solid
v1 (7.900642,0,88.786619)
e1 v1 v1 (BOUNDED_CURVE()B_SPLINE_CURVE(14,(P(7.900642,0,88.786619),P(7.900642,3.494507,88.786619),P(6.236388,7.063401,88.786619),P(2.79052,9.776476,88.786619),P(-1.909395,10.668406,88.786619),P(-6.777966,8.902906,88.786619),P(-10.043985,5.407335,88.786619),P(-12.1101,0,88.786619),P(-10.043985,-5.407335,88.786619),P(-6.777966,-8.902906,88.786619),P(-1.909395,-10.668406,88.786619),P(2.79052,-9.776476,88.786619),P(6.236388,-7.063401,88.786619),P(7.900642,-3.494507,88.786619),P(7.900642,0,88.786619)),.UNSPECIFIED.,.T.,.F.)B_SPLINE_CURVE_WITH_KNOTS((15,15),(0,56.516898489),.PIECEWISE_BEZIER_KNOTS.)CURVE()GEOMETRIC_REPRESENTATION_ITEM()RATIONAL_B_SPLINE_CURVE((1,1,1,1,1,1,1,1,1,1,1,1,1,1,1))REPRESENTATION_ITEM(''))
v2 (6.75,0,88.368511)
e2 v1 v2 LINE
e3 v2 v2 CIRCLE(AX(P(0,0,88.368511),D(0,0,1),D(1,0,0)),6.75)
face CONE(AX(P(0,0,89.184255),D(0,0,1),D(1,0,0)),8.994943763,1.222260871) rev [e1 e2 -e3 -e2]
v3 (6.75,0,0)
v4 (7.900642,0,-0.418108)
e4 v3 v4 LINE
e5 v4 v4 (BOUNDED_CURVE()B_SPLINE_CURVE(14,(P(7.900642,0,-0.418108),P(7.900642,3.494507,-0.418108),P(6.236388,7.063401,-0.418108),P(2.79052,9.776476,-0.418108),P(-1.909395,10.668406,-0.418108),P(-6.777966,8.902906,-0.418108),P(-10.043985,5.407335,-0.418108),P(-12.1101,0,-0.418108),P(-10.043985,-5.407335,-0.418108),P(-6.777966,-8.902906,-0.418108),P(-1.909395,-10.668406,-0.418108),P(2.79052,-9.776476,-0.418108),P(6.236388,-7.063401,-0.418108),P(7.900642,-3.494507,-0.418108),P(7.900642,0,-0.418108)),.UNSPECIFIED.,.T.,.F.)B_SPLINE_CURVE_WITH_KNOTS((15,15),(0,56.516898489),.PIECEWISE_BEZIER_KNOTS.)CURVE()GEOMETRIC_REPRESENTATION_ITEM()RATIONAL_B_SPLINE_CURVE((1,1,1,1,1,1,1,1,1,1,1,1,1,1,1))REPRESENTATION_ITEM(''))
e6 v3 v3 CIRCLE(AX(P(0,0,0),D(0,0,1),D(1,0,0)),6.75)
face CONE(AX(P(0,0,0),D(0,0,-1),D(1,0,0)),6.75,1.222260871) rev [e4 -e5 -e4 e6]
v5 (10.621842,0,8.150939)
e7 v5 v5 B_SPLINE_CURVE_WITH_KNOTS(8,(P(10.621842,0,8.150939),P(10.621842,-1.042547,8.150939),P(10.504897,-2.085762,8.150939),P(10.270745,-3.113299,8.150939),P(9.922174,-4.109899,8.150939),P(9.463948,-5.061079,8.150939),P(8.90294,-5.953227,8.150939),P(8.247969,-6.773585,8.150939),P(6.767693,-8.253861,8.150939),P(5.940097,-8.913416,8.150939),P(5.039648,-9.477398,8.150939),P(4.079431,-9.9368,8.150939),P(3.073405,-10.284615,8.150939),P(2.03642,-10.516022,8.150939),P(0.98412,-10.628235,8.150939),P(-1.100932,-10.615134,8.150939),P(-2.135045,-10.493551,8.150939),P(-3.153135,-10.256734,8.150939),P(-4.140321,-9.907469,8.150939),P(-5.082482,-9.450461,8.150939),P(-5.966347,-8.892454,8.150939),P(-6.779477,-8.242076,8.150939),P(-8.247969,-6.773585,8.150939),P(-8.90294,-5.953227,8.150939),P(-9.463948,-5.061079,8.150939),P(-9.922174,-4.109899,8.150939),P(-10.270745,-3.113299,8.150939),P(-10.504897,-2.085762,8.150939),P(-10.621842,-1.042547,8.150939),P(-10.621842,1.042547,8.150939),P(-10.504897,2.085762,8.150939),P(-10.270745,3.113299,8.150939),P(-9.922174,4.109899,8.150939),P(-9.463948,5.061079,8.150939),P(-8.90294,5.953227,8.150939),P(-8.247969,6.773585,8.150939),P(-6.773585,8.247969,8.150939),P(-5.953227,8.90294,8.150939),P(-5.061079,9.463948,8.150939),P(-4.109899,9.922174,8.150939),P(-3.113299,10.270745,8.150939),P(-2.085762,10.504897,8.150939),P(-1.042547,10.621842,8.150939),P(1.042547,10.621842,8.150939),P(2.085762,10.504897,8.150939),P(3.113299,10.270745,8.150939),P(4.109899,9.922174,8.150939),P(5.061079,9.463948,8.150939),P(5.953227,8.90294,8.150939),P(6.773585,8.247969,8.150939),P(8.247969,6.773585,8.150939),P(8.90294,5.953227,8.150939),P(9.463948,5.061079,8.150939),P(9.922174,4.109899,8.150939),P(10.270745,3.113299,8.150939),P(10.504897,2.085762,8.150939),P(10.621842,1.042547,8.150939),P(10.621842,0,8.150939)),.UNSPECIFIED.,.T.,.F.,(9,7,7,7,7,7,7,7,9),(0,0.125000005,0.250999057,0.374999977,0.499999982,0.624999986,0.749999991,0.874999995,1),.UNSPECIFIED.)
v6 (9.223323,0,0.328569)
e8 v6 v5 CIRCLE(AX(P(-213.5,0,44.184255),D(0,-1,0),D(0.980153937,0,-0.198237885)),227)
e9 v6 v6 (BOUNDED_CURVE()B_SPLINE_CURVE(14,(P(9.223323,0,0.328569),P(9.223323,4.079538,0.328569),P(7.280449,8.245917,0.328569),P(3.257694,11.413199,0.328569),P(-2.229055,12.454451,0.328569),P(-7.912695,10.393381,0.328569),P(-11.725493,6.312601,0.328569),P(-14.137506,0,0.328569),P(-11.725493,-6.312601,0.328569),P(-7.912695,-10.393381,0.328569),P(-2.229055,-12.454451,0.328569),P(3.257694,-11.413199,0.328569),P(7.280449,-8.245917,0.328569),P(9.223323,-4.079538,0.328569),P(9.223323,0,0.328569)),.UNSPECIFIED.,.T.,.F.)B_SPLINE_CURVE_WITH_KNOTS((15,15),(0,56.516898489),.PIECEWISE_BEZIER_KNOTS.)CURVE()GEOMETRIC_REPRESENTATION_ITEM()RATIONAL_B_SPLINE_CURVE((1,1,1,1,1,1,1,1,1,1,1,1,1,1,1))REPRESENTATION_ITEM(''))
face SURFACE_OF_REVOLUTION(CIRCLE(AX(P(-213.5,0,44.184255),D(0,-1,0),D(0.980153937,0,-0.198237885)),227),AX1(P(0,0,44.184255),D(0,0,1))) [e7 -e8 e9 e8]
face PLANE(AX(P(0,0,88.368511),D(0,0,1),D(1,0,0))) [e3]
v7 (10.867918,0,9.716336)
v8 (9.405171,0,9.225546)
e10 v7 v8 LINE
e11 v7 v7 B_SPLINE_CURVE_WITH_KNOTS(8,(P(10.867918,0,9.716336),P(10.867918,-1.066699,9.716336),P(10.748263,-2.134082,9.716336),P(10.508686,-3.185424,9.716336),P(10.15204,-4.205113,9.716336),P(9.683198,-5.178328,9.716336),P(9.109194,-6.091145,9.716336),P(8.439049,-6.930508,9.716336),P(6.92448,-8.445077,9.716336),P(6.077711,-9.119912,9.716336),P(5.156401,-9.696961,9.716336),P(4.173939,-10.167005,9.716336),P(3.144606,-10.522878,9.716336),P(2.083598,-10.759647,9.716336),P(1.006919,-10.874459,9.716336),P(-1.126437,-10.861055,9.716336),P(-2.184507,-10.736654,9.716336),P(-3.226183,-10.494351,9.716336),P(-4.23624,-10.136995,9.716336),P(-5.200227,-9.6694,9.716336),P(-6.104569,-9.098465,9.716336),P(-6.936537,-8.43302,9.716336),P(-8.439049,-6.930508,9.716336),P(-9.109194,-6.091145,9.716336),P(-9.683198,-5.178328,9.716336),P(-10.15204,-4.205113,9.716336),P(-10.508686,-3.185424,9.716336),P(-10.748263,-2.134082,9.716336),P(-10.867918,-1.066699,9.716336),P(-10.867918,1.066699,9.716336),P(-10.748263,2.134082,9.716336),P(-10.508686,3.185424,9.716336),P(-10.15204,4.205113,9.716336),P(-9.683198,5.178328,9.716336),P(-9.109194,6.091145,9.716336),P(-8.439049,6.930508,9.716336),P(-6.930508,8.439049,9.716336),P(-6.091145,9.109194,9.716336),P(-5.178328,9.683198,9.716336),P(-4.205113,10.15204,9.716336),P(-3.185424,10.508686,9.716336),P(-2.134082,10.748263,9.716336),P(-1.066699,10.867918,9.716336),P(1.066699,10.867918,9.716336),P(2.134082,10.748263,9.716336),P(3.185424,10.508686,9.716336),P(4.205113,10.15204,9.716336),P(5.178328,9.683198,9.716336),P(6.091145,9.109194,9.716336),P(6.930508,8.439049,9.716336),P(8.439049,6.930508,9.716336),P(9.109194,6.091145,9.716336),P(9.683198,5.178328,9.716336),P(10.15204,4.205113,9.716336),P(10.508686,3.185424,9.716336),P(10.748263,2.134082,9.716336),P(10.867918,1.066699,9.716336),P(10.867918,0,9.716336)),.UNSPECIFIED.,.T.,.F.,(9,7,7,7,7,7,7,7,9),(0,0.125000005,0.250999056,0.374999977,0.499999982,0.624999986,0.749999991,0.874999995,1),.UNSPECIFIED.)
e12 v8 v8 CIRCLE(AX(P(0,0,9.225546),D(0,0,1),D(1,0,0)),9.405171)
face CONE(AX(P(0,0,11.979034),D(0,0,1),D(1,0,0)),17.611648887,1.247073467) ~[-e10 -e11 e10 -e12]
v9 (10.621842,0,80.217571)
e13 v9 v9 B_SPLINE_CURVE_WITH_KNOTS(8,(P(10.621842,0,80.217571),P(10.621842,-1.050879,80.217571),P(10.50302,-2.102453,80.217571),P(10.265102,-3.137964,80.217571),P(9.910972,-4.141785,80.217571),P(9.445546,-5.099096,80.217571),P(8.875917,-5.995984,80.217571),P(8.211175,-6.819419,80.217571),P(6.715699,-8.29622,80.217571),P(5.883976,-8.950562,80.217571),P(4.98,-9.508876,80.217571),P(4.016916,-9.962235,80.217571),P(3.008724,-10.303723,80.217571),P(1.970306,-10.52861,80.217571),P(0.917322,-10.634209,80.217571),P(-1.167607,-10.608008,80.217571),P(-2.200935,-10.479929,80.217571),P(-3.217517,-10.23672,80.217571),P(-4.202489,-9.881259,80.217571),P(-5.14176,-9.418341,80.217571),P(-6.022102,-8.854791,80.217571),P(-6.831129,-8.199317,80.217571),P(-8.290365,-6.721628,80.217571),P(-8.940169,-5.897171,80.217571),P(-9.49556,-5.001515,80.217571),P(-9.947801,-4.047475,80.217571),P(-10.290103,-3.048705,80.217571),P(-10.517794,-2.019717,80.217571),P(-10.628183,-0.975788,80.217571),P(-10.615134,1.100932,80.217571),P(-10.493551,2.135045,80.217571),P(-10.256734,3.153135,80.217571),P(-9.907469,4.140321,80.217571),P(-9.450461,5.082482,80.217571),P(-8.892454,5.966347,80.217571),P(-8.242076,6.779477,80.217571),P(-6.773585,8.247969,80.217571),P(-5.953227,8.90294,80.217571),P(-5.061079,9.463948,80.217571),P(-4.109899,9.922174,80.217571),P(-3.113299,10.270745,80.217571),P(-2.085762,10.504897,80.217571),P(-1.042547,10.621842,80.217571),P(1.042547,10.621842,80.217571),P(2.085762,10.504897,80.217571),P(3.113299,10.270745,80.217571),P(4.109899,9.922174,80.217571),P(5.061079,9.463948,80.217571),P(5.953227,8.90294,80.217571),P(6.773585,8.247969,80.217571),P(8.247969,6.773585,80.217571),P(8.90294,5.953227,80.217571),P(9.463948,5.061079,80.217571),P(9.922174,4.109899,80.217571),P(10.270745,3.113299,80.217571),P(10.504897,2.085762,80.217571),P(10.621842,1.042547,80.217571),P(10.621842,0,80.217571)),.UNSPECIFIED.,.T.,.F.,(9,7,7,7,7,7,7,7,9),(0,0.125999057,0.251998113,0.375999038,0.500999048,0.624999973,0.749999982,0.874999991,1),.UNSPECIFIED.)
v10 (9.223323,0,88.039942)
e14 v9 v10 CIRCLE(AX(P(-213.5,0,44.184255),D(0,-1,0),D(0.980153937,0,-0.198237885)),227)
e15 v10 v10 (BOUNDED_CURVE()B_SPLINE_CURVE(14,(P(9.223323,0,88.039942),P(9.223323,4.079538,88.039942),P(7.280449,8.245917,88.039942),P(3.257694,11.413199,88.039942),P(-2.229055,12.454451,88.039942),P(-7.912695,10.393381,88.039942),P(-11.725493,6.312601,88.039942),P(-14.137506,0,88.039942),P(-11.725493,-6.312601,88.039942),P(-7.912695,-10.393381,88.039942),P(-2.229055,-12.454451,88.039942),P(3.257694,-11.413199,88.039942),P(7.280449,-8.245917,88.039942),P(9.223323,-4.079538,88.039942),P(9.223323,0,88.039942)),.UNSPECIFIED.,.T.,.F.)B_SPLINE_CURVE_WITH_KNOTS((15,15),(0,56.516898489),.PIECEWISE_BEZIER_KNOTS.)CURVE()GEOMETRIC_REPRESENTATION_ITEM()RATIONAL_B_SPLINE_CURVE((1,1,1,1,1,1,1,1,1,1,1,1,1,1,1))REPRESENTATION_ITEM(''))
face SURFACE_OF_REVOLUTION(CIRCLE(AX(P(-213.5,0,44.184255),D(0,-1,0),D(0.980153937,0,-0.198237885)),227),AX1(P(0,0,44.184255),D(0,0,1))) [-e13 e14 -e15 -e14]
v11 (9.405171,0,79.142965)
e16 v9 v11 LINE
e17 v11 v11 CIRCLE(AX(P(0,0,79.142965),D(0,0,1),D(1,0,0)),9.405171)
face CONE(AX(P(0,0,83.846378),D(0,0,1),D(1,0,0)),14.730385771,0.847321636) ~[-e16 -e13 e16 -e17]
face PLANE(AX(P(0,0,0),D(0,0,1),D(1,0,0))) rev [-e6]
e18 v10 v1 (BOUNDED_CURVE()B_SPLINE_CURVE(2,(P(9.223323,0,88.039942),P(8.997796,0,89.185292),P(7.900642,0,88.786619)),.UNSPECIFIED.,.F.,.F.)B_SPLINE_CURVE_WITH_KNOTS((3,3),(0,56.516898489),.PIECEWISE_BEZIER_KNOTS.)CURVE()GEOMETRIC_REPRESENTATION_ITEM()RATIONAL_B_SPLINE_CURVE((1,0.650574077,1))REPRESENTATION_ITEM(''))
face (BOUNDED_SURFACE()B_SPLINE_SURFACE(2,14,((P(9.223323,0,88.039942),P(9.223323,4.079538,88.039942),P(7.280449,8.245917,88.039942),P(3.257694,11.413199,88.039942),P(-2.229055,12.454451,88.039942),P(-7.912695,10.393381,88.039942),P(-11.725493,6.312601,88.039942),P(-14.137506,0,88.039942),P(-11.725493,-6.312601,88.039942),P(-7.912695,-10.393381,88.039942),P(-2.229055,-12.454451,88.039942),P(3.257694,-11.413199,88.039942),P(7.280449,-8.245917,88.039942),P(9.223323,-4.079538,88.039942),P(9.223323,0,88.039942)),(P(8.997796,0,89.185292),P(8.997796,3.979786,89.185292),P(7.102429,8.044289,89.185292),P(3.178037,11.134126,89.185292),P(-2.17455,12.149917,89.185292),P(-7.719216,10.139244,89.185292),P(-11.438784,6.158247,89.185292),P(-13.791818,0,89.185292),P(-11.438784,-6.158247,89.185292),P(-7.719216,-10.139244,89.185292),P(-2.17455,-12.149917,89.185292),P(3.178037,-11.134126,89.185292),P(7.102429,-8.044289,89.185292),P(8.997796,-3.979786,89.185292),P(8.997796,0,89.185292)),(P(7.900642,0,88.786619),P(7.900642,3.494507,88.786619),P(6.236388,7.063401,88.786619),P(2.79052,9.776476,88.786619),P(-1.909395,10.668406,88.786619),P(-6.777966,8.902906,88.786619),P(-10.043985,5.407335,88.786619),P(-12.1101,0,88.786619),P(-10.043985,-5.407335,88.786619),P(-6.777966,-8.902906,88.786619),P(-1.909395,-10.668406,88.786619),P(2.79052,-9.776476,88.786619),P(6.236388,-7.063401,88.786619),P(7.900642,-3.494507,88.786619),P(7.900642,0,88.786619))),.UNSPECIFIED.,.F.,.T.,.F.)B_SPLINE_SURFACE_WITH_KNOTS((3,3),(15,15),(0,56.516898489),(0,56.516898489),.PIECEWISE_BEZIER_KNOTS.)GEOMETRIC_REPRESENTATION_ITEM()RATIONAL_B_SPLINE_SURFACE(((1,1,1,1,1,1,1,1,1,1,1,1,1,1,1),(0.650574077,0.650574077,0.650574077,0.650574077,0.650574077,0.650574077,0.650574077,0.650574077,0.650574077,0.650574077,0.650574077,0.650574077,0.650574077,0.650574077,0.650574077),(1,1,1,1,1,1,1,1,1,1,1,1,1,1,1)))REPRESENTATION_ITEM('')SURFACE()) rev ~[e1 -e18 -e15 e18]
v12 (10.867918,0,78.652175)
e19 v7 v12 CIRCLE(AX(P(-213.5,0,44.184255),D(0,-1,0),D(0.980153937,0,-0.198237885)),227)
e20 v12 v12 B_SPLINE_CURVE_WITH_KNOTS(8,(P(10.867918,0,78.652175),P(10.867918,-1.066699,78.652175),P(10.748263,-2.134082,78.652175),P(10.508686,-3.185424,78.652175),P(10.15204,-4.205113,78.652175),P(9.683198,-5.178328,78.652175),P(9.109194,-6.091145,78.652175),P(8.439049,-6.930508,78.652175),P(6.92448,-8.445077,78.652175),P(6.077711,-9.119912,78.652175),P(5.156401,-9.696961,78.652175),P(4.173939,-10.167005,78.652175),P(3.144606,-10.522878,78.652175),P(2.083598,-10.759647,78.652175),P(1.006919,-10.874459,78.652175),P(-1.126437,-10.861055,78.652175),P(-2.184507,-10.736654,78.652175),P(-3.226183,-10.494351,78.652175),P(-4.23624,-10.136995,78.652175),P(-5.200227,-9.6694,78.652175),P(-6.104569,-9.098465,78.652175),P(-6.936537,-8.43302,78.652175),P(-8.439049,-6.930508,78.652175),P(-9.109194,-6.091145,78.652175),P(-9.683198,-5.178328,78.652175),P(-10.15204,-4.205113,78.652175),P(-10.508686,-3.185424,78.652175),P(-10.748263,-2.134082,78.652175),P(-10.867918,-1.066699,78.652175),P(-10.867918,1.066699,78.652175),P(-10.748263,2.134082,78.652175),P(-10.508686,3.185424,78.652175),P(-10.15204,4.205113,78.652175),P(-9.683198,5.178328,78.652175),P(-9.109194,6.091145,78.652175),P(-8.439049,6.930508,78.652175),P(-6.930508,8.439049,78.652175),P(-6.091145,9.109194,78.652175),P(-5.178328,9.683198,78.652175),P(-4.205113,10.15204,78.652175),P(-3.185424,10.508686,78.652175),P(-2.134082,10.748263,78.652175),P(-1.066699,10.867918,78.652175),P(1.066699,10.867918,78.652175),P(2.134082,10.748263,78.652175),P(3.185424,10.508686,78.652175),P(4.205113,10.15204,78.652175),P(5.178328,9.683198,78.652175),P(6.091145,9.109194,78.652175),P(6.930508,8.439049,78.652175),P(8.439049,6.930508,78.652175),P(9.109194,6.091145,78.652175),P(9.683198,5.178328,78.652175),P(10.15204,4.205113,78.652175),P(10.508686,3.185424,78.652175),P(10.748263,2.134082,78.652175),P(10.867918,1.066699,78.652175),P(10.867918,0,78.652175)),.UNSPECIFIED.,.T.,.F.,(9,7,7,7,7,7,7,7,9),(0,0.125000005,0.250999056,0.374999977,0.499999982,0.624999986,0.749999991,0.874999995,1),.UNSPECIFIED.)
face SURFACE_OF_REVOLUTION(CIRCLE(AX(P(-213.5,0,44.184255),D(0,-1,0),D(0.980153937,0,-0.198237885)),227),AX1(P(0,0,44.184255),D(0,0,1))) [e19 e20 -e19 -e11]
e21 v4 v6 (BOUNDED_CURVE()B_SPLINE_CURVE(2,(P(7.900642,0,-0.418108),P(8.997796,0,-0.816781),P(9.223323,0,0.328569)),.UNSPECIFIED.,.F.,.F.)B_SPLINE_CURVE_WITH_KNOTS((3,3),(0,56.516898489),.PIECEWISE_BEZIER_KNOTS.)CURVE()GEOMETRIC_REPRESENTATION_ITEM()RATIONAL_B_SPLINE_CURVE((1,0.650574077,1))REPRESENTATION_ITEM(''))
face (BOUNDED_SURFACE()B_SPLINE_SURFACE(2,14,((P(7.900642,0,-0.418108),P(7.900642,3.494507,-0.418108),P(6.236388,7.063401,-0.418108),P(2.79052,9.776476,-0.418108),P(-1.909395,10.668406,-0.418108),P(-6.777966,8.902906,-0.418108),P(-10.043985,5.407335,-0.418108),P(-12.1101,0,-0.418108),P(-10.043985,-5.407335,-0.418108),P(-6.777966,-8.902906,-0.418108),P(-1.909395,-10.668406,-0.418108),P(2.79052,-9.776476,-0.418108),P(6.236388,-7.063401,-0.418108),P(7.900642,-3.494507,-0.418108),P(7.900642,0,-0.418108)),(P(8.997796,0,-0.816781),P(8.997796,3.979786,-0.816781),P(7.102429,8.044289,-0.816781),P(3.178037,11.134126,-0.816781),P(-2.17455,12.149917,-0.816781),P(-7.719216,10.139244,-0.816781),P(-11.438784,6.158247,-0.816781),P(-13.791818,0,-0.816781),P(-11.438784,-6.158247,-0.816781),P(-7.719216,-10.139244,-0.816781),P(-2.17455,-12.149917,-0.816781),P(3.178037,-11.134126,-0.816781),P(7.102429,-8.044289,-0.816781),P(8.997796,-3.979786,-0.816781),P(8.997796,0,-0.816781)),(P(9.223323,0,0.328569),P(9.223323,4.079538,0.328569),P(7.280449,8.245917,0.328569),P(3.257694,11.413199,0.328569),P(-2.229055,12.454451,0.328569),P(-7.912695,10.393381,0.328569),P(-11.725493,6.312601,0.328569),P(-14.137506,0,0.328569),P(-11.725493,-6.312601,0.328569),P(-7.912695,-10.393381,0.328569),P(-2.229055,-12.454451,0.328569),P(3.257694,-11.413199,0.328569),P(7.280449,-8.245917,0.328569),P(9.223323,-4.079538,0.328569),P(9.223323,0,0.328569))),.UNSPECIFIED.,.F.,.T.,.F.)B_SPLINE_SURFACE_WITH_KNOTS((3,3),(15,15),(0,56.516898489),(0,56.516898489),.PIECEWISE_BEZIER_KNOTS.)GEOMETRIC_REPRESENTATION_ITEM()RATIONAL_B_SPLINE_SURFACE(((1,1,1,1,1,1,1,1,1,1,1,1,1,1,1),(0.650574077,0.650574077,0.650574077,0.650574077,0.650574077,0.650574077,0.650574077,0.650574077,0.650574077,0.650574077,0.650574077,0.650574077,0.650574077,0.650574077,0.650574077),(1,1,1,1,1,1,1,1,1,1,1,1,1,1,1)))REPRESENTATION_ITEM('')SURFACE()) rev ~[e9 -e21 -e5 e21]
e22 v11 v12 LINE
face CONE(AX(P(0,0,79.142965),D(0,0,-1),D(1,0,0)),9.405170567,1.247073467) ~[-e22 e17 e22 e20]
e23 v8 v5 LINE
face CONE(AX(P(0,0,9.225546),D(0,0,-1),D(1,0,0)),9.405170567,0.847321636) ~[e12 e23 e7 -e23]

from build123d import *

# Parameters (mm, degrees)
F2_R = 1


with BuildPart() as f1:
    # F0 (on Front) → F1 (revolve)
    with BuildSketch(Plane.XZ):
        with BuildLine():
            Line((6.75, 0), (8.9949437628, -0.8157445242))
            ThreePointArc((8.9949437628, -0.8157445242), (13.5, 44.1842554758), (8.9949437628, 89.1842554758))
            Line((8.9949437628, 89.1842554758), (6.75, 88.3685109515))
            Line((6.75, 88.3685109515), (0, 88.3685109515))
            Line((0, 88.3685109515), (0, 0))
            Line((0, 0), (6.75, 0))
        make_face()
    revolve(axis=Axis((0, 0, 44.1842554758), (0, 0, 1)))

    # F2
    f2_edges = [f1.edges().sort_by_distance(p)[0] for p in [
        (-8.994944, 0, -0.815745),
        (-8.994944, 0, 89.184255),
    ]]
    fillet(f2_edges, radius=F2_R)

    # F3 (on Front) → F4 (revolve, cut)
    with BuildSketch(Plane.XZ):
        Polygon((17.6116488874, 76.3894766569), (14.7303857711, 83.846378142), (9.4051705673, 79.1429653764), align=None)
        Polygon((9.4051705673, 9.2255455751), (14.7303857711, 4.5221328095), (17.6116488874, 11.9790342946), align=None)
    revolve(axis=Axis((0, 0, 27.809754014), (0, 0, 1)), mode=Mode.SUBTRACT)


solid = f1.part
